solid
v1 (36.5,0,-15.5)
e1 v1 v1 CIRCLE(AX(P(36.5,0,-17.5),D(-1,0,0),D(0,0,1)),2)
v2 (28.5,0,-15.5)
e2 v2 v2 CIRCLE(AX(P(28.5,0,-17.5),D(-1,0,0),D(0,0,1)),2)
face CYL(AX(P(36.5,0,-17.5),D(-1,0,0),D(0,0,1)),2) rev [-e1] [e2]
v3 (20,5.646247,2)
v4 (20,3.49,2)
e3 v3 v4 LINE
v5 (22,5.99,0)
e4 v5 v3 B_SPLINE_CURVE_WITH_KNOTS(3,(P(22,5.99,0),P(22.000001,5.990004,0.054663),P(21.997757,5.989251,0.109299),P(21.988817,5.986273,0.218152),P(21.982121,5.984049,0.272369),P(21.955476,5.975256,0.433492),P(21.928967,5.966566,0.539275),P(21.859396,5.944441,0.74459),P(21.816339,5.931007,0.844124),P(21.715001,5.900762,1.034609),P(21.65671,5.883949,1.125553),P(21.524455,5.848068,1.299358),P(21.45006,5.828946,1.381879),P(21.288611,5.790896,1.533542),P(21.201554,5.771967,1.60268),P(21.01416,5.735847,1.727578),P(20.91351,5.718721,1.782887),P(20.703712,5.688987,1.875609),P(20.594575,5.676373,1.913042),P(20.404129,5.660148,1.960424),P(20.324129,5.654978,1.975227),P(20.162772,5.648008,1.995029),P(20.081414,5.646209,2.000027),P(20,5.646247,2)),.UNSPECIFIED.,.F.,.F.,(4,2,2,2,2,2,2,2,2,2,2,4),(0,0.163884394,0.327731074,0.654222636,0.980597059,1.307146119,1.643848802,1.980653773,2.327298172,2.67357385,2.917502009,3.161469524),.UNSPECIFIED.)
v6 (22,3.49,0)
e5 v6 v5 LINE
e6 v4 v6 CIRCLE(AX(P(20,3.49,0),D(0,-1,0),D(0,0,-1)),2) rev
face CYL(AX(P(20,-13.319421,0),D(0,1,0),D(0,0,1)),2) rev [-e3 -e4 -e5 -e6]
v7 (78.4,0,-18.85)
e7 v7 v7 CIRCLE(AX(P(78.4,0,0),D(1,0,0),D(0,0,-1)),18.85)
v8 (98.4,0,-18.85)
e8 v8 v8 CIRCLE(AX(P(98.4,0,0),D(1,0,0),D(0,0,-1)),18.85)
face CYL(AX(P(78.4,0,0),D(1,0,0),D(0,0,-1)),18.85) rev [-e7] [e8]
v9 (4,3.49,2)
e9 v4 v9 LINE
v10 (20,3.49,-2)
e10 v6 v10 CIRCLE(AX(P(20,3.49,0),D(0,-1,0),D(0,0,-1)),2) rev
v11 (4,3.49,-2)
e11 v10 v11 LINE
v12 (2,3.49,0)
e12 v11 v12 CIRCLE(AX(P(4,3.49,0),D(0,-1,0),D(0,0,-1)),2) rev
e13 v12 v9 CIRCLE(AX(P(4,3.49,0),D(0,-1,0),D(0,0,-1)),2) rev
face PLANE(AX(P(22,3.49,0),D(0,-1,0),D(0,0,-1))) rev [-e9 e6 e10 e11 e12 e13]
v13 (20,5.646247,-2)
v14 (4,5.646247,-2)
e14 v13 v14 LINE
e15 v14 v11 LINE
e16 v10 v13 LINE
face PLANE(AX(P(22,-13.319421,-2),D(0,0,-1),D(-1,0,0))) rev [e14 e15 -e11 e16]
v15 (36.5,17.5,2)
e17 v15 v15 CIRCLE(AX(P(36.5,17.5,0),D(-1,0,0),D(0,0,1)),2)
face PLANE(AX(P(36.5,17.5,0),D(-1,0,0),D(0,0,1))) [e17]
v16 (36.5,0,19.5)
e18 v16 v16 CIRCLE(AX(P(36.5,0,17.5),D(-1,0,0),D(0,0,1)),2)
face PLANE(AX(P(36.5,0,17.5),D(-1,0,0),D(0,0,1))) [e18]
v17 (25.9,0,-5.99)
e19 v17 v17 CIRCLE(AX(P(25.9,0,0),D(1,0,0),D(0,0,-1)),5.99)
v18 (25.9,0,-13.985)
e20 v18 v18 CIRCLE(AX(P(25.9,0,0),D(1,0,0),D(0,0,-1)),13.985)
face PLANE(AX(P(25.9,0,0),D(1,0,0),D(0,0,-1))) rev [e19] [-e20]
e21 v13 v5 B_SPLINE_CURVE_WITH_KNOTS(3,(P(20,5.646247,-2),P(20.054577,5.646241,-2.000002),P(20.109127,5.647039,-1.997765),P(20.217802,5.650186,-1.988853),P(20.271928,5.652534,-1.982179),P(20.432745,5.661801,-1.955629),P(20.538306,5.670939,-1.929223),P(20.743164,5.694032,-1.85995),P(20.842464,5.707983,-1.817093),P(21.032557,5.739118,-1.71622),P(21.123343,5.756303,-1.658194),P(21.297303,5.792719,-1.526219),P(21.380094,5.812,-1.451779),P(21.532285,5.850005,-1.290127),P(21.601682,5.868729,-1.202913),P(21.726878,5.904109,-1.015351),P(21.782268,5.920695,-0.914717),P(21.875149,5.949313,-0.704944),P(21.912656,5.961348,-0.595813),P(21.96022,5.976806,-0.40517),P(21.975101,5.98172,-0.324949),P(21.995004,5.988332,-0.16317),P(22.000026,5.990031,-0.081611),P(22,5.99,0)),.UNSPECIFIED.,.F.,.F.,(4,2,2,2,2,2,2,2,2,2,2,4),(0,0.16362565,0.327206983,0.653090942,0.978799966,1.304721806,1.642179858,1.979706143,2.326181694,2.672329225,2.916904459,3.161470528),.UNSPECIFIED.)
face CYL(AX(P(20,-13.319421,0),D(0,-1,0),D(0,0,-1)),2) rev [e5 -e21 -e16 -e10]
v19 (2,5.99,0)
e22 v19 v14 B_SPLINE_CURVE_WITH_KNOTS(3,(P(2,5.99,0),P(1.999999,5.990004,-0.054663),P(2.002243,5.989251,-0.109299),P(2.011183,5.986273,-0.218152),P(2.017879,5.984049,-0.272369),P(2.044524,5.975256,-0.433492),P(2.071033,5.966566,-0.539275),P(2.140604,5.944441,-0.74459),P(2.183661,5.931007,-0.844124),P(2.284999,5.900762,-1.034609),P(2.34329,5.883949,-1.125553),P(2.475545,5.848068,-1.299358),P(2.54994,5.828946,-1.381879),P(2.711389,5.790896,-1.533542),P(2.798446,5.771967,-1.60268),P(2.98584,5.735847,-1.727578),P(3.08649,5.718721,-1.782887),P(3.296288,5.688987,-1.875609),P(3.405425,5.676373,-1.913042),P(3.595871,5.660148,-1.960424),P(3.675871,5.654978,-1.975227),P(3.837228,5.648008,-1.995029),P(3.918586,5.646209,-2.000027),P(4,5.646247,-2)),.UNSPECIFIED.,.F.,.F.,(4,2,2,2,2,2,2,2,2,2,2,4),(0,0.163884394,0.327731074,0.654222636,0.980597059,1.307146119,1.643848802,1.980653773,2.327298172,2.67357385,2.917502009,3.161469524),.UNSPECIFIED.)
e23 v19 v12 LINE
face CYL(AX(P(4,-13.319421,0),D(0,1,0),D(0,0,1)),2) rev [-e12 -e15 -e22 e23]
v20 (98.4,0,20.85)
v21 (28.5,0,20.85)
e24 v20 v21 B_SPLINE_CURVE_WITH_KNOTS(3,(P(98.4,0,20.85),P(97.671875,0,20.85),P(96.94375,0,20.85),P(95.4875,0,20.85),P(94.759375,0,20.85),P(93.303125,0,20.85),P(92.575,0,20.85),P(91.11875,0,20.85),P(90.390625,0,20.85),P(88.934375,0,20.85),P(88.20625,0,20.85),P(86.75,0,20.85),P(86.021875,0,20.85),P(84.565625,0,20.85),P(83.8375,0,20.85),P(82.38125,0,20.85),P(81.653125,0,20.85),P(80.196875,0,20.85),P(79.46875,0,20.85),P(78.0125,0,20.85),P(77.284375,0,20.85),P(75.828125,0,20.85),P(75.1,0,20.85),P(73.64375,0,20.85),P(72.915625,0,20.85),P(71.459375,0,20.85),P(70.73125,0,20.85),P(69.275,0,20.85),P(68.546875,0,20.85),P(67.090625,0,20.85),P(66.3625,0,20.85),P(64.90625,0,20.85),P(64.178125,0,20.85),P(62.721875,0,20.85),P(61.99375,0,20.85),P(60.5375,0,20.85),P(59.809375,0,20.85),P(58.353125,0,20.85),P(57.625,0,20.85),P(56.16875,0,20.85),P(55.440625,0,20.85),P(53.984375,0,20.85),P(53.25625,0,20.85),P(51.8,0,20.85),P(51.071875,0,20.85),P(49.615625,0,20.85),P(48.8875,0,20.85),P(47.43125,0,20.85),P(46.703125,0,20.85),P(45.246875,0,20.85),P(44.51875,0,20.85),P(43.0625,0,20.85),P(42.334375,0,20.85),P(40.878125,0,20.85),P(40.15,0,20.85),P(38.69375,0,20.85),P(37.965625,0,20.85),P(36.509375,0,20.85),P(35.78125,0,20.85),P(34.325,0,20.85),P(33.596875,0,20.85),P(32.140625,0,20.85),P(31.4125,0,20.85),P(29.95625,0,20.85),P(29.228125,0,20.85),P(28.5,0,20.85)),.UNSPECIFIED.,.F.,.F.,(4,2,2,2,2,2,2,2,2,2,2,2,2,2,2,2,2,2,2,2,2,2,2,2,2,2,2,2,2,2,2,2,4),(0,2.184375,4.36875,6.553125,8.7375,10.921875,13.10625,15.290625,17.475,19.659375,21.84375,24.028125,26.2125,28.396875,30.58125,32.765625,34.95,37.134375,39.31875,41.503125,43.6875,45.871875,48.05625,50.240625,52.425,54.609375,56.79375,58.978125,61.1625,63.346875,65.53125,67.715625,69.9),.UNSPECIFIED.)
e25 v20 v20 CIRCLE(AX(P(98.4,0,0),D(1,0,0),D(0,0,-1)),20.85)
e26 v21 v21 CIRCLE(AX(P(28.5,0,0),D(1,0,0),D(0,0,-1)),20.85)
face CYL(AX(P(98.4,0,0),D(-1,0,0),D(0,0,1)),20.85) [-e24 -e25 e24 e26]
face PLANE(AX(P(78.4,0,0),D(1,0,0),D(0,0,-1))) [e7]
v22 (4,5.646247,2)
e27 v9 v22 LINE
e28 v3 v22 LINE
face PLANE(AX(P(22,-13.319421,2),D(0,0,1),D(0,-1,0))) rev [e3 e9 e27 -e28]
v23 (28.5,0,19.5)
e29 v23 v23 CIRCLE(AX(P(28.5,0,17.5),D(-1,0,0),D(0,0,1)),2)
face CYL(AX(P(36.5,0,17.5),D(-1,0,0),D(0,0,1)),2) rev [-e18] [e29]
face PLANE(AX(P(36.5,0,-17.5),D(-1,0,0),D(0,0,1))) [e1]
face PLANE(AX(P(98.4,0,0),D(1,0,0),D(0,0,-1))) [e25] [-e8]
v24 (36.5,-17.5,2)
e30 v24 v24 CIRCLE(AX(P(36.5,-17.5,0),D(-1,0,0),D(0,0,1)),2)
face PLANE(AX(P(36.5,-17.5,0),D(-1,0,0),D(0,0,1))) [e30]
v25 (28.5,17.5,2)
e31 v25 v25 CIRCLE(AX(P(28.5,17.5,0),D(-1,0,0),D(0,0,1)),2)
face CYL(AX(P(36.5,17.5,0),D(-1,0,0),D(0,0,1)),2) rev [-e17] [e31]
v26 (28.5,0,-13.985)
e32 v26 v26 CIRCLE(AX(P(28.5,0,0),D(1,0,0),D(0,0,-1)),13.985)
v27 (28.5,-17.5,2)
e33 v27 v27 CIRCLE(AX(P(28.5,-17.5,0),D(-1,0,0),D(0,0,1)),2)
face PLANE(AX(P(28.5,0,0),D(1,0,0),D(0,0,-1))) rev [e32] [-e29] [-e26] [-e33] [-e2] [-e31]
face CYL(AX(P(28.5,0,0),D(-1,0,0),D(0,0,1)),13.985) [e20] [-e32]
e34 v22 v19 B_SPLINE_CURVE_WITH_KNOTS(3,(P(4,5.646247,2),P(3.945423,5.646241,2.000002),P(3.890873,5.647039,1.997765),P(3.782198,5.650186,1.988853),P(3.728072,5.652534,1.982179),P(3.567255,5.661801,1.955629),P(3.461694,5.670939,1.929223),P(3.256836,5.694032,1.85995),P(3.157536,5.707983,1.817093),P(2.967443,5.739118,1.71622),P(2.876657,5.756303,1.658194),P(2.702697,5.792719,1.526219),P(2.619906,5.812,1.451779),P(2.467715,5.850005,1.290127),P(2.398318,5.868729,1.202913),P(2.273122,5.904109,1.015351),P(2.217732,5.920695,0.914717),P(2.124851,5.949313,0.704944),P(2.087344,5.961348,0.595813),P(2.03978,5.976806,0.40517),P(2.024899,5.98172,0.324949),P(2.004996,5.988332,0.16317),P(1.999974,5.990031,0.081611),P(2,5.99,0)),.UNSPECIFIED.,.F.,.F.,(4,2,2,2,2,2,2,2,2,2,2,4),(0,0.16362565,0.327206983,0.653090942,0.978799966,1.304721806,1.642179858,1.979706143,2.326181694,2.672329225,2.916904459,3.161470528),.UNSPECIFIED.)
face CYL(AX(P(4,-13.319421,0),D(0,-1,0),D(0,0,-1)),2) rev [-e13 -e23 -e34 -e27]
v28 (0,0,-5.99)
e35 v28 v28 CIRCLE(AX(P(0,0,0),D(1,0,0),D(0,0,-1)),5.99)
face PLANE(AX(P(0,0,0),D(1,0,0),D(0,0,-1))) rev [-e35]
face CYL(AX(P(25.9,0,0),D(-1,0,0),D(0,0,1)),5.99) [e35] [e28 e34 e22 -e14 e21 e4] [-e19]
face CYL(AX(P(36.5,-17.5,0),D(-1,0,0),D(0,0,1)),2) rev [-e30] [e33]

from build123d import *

# Parameters (mm, degrees)
SKETCH1_R          = 5.99
EXTRUDE1_DEPTH     = 25.9
SKETCH2_R          = 13.985
EXTRUDE2_DEPTH     = 2.6
SKETCH3_R          = 20.85
EXTRUDE3_DEPTH     = 69.9
CUT_EXTRUDE1_START = -2
CUT_EXTRUDE1_DEPTH = 20
FILLET8_R          = 2
SKETCH7_R          = 2
CUT_EXTRUDE2_DEPTH = 8
SKETCH9_R          = 18.85
CUT_EXTRUDE3_DEPTH = 20


with BuildPart() as part:
    # Sketch1 → Extrude1 (new body)
    with BuildSketch(Plane(origin=(0, 0, 0), x_dir=(0, 0, -1), z_dir=(1, 0, 0))):
        with Locations(Location((0, 0, 0), (0, 0, 180))):
            Circle(SKETCH1_R)
    extrude(amount=EXTRUDE1_DEPTH)

    # Sketch2 → Extrude2 (add)
    with BuildSketch(Plane(origin=(25.9, 0, 0), x_dir=(0, 0, -1), z_dir=(1, 0, 0))):
        Circle(SKETCH2_R)
    extrude(amount=EXTRUDE2_DEPTH)

    # Sketch3 → Extrude3 (add)
    with BuildSketch(Plane(origin=(28.5, 0, 0), x_dir=(0, 0, -1), z_dir=(1, 0, 0))):
        with Locations(Location((0, 0, 0), (0, 0, 180))):
            Circle(SKETCH3_R)
    extrude(amount=EXTRUDE3_DEPTH)

    # Sketch6 → Cut-Extrude1 (cut)
    with BuildSketch(Plane.ZY.offset(CUT_EXTRUDE1_START)):
        with BuildLine():
            Line((0, 3.49), (0, 5.99))
            ThreePointArc((0, 5.99), (-1.014663299, 5.903436151), (-2, 5.646246541))
            Line((-2, 5.646246541), (-2, 3.49))
            Line((-2, 3.49), (0, 3.49))
        make_face()
        with BuildLine():
            ThreePointArc((2, 5.646246541), (1.014663299, 5.903436151), (0, 5.99))
            Line((0, 5.99), (0, 3.49))
            Line((0, 3.49), (2, 3.49))
            Line((2, 3.49), (2, 5.646246541))
        make_face()
    extrude(amount=-CUT_EXTRUDE1_DEPTH, mode=Mode.SUBTRACT)

    # Fillet8
    fillet8_edges = [part.edges().sort_by_distance(p)[0] for p in [
        (2, 4.56812327, -2),
        (22, 4.56812327, -2),
        (2, 4.56812327, 2),
        (22, 4.56812327, 2),
    ]]
    fillet(fillet8_edges, radius=FILLET8_R - 0.0001)  # a hair under: the kernel refuses the full size

    # Sketch7 → Cut-Extrude2 (cut)
    with BuildSketch(Plane.ZY.offset(-28.5)):
        with Locations((0, 17.5)):
            Circle(SKETCH7_R)
        with Locations((17.5, 0)):
            Circle(SKETCH7_R)
        with Locations((0, -17.5)):
            Circle(SKETCH7_R)
        with Locations((-17.5, 0)):
            Circle(SKETCH7_R)
    extrude(amount=-CUT_EXTRUDE2_DEPTH, mode=Mode.SUBTRACT)

    # Sketch9 → Cut-Extrude3 (cut)
    with BuildSketch(Plane(origin=(98.4, 0, 0), x_dir=(0, 0, -1), z_dir=(1, 0, 0))):
        Circle(SKETCH9_R)
    extrude(amount=-CUT_EXTRUDE3_DEPTH, mode=Mode.SUBTRACT)


solid = part.part
